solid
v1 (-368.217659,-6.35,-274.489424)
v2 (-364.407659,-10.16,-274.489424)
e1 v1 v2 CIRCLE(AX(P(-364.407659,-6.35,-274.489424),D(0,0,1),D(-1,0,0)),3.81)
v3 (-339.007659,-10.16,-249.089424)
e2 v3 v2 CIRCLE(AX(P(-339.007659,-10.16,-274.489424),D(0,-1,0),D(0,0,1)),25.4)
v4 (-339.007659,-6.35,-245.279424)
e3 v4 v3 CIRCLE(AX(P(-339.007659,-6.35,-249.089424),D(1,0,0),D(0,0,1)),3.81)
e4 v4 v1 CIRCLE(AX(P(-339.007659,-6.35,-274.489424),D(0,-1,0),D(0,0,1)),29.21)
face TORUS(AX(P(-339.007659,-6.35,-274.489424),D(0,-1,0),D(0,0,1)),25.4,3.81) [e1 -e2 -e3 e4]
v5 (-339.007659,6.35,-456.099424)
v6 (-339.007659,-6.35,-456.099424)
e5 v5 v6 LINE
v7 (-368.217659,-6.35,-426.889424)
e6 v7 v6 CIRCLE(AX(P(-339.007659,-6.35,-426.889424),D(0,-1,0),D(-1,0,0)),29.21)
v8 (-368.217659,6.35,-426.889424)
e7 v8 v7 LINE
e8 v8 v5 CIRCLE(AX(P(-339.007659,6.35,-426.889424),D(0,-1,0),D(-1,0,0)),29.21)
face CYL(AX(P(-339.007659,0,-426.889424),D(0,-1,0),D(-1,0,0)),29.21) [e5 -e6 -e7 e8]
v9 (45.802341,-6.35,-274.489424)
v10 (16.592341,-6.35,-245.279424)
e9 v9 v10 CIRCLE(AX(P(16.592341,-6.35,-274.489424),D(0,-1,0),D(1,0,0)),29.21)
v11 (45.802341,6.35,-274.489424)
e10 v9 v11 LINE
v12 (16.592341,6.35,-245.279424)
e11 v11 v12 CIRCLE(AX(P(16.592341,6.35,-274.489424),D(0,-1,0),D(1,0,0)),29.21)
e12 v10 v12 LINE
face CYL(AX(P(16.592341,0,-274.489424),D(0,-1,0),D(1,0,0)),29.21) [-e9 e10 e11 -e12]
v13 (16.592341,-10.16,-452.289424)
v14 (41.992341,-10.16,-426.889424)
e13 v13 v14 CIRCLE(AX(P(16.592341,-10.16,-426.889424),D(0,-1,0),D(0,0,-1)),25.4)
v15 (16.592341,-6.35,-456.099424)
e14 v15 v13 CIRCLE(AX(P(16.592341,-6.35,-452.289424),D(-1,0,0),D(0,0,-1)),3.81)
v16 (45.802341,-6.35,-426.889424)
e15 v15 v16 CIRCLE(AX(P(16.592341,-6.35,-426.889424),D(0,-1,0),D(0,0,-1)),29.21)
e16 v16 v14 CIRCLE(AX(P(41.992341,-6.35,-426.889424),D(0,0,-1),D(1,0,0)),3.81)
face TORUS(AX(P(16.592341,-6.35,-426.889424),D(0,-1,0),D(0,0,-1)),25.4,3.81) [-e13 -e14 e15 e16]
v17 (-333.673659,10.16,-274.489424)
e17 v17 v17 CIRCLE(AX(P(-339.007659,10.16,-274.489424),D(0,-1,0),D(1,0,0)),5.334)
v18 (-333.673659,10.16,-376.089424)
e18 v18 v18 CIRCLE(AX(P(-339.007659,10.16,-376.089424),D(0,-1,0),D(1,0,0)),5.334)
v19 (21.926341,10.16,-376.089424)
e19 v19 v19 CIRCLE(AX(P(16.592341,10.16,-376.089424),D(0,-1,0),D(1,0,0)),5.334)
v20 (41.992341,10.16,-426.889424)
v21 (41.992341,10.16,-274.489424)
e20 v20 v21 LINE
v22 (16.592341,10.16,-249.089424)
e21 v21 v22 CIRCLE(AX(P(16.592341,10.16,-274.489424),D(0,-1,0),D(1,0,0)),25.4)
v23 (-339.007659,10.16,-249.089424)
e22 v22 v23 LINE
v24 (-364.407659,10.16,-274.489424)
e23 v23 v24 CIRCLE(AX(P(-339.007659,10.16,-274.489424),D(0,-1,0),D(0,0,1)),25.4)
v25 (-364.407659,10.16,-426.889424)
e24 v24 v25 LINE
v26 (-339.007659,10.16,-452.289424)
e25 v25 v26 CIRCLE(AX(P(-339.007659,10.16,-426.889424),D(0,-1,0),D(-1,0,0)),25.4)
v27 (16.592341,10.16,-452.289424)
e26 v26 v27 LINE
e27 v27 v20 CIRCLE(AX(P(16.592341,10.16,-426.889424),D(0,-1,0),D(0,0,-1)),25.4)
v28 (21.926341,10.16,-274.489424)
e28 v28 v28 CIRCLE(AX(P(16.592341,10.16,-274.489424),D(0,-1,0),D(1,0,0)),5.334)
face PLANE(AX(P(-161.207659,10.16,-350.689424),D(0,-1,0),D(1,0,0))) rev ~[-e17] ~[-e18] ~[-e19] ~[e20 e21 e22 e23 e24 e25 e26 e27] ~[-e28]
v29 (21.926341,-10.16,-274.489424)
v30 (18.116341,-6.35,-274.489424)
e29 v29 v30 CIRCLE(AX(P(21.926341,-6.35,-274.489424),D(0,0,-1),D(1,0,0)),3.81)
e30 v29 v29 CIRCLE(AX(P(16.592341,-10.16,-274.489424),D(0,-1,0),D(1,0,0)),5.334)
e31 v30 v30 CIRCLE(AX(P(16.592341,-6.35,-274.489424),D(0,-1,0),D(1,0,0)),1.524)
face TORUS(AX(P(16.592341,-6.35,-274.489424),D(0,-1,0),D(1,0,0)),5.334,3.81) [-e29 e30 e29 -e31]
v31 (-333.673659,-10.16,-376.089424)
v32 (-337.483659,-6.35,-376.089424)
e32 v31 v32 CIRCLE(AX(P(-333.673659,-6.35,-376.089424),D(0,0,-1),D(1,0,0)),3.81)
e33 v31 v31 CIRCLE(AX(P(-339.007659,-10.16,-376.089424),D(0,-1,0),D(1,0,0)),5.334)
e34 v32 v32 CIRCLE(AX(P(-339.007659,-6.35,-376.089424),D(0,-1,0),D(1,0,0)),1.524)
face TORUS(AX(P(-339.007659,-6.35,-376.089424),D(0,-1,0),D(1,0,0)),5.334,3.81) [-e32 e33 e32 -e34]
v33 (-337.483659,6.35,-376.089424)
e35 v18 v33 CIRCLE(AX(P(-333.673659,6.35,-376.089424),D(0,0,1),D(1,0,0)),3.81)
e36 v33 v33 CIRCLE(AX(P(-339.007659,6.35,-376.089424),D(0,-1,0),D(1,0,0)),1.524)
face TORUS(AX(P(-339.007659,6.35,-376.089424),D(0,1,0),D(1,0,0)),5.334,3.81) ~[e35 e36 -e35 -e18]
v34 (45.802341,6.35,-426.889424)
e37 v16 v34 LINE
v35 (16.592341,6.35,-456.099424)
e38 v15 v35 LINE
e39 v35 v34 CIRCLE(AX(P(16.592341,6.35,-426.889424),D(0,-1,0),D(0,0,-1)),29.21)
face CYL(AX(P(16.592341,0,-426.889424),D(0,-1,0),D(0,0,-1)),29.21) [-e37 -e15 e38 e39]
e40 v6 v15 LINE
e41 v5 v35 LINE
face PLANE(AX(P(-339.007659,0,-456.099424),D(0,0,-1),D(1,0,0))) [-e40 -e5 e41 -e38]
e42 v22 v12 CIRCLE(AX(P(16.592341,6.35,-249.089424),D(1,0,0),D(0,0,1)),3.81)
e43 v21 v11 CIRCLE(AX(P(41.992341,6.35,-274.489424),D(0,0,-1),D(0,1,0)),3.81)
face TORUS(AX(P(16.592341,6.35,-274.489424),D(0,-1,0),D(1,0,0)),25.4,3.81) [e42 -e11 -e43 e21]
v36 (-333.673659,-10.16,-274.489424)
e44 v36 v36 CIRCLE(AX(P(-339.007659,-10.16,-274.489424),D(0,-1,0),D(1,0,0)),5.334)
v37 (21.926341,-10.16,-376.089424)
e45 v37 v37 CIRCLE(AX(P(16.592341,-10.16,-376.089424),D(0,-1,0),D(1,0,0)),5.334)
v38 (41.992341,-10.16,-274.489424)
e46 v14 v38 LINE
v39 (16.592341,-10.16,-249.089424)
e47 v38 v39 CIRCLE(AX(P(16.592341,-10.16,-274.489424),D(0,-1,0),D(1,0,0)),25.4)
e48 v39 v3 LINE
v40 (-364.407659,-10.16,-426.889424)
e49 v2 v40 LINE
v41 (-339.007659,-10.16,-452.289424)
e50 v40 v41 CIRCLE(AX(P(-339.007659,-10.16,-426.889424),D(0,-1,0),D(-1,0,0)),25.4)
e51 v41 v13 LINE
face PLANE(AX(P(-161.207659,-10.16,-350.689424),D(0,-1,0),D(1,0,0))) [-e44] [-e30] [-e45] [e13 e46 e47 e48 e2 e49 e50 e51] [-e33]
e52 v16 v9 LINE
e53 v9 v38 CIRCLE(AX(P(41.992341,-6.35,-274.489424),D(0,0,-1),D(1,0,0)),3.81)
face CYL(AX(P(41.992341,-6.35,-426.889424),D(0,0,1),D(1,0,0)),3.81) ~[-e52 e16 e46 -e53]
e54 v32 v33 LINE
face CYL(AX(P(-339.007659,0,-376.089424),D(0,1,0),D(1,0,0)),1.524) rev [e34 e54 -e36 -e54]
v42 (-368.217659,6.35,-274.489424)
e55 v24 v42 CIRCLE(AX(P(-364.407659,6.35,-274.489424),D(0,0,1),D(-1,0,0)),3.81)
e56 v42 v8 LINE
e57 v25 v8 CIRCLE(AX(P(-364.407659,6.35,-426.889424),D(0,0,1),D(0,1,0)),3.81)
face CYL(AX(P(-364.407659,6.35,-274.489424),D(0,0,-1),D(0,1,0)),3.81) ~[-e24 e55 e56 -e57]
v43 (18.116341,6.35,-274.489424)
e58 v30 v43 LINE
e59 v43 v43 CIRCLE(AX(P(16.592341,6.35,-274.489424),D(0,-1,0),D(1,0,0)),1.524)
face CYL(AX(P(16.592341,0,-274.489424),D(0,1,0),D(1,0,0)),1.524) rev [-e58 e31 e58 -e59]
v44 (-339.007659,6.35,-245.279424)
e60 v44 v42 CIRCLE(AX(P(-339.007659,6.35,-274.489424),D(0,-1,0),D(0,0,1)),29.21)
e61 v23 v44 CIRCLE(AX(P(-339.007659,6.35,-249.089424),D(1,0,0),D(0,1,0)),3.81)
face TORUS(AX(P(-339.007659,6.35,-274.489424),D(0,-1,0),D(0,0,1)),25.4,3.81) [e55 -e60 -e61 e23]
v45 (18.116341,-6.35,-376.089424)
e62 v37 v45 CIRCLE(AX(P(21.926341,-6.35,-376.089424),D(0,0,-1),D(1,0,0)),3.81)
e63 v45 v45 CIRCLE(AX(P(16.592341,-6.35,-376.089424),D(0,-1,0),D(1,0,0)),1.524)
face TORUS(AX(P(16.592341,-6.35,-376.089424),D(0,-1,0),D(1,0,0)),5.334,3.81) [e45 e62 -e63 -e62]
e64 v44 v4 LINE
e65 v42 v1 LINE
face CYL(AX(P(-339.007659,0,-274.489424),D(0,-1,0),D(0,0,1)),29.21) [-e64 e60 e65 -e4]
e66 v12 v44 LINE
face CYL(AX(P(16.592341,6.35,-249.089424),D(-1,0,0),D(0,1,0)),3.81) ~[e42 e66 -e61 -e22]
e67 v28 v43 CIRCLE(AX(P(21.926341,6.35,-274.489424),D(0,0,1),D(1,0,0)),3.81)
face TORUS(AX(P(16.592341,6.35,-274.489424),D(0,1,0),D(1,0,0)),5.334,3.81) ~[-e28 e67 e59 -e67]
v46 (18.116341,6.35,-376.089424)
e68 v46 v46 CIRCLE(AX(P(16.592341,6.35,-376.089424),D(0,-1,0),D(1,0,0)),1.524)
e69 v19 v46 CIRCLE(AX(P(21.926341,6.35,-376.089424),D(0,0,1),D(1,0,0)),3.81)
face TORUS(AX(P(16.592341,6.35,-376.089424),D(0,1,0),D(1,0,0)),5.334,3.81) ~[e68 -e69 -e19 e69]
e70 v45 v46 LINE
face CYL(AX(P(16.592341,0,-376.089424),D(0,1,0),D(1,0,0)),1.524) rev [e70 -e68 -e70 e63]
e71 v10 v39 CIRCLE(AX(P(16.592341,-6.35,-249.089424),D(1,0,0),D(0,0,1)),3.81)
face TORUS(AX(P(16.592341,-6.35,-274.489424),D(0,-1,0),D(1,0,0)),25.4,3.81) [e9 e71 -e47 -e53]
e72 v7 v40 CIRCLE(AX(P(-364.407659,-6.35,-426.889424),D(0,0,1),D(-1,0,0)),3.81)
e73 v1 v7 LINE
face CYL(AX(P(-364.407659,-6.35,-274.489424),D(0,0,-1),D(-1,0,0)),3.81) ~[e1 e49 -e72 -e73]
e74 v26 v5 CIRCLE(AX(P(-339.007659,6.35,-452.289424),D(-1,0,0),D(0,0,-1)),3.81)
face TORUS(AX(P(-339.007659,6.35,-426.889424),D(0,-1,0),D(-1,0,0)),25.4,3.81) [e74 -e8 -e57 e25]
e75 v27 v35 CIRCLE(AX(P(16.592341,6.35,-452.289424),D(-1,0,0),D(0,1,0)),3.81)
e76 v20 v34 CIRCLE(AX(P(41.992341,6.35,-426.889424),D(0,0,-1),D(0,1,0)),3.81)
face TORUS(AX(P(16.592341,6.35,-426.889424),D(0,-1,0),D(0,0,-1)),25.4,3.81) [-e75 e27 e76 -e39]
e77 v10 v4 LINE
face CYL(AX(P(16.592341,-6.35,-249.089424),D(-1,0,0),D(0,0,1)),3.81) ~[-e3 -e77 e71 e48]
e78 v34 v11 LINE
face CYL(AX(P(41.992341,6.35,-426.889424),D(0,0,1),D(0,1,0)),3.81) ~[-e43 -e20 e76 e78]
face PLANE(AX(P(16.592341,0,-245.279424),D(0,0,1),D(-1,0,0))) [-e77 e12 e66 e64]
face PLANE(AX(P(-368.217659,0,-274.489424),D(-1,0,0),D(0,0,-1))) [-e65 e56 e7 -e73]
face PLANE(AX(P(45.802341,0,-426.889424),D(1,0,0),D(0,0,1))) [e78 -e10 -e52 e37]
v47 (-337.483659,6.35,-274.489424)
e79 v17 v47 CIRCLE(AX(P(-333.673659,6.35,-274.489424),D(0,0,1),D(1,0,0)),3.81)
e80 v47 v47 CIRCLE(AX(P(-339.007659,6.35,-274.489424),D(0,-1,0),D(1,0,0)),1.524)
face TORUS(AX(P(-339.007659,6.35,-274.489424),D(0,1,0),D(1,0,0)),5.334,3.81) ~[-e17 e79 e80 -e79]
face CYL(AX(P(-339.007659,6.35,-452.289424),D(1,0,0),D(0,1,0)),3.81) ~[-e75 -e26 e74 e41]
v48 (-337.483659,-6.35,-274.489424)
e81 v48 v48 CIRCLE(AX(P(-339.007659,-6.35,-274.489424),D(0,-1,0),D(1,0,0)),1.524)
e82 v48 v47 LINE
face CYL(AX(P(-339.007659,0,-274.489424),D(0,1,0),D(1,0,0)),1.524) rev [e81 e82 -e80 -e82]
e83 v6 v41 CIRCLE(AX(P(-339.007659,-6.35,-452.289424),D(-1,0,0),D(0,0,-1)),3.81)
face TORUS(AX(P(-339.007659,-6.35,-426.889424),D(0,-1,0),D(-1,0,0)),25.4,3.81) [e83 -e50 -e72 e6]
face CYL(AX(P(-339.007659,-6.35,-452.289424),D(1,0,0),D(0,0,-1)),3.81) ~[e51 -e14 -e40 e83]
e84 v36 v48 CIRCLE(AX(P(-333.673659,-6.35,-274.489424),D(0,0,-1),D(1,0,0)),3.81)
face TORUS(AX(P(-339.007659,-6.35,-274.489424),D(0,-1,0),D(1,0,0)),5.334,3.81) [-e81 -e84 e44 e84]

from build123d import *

# Parameters (mm, degrees)
F0_R     = 1.524
F1_DEPTH = 10.16
F2_R     = 3.81
F3_R     = 3.81


# Not quite as in the source:
# - a feature names something its author has since deleted; it is built from what else it names


with BuildPart() as f1:
    # F0 (on Front) → F1 (new body, symmetric)
    with BuildSketch(Plane.XZ):
        with BuildLine():
            Line((16.592341423, -245.2794238949), (-339.007658577, -245.2794238949))
            ThreePointArc((-339.007658577, -245.2794238949), (-359.6622476554, -253.8348348164), (-368.217658577, -274.4894238949))
            Line((-368.217658577, -274.4894238949), (-368.217658577, -426.8894238949))
            ThreePointArc((-368.217658577, -426.8894238949), (-359.6622476554, -447.5440129733), (-339.007658577, -456.0994238949))
            Line((-339.007658577, -456.0994238949), (16.592341423, -456.0994238949))
            ThreePointArc((16.592341423, -456.0994238949), (37.2469305015, -447.5440129733), (45.802341423, -426.8894238949))
            Line((45.802341423, -426.8894238949), (45.802341423, -274.4894238949))
            ThreePointArc((45.802341423, -274.4894238949), (37.2469305015, -253.8348348164), (16.592341423, -245.2794238949))
        make_face()
        with Locations((-339.007658577, -376.0894238949)):
            Circle(F0_R, mode=Mode.SUBTRACT)
        with Locations((16.592341423, -376.0894238949)):
            Circle(F0_R, mode=Mode.SUBTRACT)
        with Locations((-339.007658577, -274.4894238949)):
            Circle(F0_R, mode=Mode.SUBTRACT)
        with Locations((16.592341423, -274.4894238949)):
            Circle(F0_R, mode=Mode.SUBTRACT)
    extrude(amount=F1_DEPTH, both=True)

    # F2
    f2_edges = [f1.edges().sort_by_distance(p)[0] for p in [
        (45.802341, -10.16, -350.689424),
        (37.246931, -10.16, -253.834835),
        (-161.207659, -10.16, -245.279424),
        (-359.662248, -10.16, -253.834835),
        (-368.217659, -10.16, -350.689424),
        (-359.662248, -10.16, -447.544013),
        (-161.207659, -10.16, -456.099424),
        (37.246931, -10.16, -447.544013),
        (-340.531659, -10.16, -376.089424),
        (15.068341, -10.16, -376.089424),
        (-340.531659, -10.16, -274.489424),
        (15.068341, -10.16, -274.489424),
    ]]
    fillet(f2_edges, radius=F2_R)

    # F3
    f3_edges = [f1.edges().sort_by_distance(p)[0] for p in [
        (45.802341, 10.16, -350.689424),
        (37.246931, 10.16, -253.834835),
        (-161.207659, 10.16, -245.279424),
        (-359.662248, 10.16, -253.834835),
        (-368.217659, 10.16, -350.689424),
        (-359.662248, 10.16, -447.544013),
        (-161.207659, 10.16, -456.099424),
        (37.246931, 10.16, -447.544013),
        (-340.531659, 10.16, -376.089424),
        (15.068341, 10.16, -376.089424),
        (-340.531659, 10.16, -274.489424),
        (15.068341, 10.16, -274.489424),
        (-367.101735, -9.044077, -426.889424),
        (-359.662248, -6.35, -447.544013),
        (-356.968171, -10.16, -444.849936),
        (-339.007659, -9.044077, -454.983501),
    ]]
    fillet(f3_edges, radius=F3_R)


solid = f1.part
